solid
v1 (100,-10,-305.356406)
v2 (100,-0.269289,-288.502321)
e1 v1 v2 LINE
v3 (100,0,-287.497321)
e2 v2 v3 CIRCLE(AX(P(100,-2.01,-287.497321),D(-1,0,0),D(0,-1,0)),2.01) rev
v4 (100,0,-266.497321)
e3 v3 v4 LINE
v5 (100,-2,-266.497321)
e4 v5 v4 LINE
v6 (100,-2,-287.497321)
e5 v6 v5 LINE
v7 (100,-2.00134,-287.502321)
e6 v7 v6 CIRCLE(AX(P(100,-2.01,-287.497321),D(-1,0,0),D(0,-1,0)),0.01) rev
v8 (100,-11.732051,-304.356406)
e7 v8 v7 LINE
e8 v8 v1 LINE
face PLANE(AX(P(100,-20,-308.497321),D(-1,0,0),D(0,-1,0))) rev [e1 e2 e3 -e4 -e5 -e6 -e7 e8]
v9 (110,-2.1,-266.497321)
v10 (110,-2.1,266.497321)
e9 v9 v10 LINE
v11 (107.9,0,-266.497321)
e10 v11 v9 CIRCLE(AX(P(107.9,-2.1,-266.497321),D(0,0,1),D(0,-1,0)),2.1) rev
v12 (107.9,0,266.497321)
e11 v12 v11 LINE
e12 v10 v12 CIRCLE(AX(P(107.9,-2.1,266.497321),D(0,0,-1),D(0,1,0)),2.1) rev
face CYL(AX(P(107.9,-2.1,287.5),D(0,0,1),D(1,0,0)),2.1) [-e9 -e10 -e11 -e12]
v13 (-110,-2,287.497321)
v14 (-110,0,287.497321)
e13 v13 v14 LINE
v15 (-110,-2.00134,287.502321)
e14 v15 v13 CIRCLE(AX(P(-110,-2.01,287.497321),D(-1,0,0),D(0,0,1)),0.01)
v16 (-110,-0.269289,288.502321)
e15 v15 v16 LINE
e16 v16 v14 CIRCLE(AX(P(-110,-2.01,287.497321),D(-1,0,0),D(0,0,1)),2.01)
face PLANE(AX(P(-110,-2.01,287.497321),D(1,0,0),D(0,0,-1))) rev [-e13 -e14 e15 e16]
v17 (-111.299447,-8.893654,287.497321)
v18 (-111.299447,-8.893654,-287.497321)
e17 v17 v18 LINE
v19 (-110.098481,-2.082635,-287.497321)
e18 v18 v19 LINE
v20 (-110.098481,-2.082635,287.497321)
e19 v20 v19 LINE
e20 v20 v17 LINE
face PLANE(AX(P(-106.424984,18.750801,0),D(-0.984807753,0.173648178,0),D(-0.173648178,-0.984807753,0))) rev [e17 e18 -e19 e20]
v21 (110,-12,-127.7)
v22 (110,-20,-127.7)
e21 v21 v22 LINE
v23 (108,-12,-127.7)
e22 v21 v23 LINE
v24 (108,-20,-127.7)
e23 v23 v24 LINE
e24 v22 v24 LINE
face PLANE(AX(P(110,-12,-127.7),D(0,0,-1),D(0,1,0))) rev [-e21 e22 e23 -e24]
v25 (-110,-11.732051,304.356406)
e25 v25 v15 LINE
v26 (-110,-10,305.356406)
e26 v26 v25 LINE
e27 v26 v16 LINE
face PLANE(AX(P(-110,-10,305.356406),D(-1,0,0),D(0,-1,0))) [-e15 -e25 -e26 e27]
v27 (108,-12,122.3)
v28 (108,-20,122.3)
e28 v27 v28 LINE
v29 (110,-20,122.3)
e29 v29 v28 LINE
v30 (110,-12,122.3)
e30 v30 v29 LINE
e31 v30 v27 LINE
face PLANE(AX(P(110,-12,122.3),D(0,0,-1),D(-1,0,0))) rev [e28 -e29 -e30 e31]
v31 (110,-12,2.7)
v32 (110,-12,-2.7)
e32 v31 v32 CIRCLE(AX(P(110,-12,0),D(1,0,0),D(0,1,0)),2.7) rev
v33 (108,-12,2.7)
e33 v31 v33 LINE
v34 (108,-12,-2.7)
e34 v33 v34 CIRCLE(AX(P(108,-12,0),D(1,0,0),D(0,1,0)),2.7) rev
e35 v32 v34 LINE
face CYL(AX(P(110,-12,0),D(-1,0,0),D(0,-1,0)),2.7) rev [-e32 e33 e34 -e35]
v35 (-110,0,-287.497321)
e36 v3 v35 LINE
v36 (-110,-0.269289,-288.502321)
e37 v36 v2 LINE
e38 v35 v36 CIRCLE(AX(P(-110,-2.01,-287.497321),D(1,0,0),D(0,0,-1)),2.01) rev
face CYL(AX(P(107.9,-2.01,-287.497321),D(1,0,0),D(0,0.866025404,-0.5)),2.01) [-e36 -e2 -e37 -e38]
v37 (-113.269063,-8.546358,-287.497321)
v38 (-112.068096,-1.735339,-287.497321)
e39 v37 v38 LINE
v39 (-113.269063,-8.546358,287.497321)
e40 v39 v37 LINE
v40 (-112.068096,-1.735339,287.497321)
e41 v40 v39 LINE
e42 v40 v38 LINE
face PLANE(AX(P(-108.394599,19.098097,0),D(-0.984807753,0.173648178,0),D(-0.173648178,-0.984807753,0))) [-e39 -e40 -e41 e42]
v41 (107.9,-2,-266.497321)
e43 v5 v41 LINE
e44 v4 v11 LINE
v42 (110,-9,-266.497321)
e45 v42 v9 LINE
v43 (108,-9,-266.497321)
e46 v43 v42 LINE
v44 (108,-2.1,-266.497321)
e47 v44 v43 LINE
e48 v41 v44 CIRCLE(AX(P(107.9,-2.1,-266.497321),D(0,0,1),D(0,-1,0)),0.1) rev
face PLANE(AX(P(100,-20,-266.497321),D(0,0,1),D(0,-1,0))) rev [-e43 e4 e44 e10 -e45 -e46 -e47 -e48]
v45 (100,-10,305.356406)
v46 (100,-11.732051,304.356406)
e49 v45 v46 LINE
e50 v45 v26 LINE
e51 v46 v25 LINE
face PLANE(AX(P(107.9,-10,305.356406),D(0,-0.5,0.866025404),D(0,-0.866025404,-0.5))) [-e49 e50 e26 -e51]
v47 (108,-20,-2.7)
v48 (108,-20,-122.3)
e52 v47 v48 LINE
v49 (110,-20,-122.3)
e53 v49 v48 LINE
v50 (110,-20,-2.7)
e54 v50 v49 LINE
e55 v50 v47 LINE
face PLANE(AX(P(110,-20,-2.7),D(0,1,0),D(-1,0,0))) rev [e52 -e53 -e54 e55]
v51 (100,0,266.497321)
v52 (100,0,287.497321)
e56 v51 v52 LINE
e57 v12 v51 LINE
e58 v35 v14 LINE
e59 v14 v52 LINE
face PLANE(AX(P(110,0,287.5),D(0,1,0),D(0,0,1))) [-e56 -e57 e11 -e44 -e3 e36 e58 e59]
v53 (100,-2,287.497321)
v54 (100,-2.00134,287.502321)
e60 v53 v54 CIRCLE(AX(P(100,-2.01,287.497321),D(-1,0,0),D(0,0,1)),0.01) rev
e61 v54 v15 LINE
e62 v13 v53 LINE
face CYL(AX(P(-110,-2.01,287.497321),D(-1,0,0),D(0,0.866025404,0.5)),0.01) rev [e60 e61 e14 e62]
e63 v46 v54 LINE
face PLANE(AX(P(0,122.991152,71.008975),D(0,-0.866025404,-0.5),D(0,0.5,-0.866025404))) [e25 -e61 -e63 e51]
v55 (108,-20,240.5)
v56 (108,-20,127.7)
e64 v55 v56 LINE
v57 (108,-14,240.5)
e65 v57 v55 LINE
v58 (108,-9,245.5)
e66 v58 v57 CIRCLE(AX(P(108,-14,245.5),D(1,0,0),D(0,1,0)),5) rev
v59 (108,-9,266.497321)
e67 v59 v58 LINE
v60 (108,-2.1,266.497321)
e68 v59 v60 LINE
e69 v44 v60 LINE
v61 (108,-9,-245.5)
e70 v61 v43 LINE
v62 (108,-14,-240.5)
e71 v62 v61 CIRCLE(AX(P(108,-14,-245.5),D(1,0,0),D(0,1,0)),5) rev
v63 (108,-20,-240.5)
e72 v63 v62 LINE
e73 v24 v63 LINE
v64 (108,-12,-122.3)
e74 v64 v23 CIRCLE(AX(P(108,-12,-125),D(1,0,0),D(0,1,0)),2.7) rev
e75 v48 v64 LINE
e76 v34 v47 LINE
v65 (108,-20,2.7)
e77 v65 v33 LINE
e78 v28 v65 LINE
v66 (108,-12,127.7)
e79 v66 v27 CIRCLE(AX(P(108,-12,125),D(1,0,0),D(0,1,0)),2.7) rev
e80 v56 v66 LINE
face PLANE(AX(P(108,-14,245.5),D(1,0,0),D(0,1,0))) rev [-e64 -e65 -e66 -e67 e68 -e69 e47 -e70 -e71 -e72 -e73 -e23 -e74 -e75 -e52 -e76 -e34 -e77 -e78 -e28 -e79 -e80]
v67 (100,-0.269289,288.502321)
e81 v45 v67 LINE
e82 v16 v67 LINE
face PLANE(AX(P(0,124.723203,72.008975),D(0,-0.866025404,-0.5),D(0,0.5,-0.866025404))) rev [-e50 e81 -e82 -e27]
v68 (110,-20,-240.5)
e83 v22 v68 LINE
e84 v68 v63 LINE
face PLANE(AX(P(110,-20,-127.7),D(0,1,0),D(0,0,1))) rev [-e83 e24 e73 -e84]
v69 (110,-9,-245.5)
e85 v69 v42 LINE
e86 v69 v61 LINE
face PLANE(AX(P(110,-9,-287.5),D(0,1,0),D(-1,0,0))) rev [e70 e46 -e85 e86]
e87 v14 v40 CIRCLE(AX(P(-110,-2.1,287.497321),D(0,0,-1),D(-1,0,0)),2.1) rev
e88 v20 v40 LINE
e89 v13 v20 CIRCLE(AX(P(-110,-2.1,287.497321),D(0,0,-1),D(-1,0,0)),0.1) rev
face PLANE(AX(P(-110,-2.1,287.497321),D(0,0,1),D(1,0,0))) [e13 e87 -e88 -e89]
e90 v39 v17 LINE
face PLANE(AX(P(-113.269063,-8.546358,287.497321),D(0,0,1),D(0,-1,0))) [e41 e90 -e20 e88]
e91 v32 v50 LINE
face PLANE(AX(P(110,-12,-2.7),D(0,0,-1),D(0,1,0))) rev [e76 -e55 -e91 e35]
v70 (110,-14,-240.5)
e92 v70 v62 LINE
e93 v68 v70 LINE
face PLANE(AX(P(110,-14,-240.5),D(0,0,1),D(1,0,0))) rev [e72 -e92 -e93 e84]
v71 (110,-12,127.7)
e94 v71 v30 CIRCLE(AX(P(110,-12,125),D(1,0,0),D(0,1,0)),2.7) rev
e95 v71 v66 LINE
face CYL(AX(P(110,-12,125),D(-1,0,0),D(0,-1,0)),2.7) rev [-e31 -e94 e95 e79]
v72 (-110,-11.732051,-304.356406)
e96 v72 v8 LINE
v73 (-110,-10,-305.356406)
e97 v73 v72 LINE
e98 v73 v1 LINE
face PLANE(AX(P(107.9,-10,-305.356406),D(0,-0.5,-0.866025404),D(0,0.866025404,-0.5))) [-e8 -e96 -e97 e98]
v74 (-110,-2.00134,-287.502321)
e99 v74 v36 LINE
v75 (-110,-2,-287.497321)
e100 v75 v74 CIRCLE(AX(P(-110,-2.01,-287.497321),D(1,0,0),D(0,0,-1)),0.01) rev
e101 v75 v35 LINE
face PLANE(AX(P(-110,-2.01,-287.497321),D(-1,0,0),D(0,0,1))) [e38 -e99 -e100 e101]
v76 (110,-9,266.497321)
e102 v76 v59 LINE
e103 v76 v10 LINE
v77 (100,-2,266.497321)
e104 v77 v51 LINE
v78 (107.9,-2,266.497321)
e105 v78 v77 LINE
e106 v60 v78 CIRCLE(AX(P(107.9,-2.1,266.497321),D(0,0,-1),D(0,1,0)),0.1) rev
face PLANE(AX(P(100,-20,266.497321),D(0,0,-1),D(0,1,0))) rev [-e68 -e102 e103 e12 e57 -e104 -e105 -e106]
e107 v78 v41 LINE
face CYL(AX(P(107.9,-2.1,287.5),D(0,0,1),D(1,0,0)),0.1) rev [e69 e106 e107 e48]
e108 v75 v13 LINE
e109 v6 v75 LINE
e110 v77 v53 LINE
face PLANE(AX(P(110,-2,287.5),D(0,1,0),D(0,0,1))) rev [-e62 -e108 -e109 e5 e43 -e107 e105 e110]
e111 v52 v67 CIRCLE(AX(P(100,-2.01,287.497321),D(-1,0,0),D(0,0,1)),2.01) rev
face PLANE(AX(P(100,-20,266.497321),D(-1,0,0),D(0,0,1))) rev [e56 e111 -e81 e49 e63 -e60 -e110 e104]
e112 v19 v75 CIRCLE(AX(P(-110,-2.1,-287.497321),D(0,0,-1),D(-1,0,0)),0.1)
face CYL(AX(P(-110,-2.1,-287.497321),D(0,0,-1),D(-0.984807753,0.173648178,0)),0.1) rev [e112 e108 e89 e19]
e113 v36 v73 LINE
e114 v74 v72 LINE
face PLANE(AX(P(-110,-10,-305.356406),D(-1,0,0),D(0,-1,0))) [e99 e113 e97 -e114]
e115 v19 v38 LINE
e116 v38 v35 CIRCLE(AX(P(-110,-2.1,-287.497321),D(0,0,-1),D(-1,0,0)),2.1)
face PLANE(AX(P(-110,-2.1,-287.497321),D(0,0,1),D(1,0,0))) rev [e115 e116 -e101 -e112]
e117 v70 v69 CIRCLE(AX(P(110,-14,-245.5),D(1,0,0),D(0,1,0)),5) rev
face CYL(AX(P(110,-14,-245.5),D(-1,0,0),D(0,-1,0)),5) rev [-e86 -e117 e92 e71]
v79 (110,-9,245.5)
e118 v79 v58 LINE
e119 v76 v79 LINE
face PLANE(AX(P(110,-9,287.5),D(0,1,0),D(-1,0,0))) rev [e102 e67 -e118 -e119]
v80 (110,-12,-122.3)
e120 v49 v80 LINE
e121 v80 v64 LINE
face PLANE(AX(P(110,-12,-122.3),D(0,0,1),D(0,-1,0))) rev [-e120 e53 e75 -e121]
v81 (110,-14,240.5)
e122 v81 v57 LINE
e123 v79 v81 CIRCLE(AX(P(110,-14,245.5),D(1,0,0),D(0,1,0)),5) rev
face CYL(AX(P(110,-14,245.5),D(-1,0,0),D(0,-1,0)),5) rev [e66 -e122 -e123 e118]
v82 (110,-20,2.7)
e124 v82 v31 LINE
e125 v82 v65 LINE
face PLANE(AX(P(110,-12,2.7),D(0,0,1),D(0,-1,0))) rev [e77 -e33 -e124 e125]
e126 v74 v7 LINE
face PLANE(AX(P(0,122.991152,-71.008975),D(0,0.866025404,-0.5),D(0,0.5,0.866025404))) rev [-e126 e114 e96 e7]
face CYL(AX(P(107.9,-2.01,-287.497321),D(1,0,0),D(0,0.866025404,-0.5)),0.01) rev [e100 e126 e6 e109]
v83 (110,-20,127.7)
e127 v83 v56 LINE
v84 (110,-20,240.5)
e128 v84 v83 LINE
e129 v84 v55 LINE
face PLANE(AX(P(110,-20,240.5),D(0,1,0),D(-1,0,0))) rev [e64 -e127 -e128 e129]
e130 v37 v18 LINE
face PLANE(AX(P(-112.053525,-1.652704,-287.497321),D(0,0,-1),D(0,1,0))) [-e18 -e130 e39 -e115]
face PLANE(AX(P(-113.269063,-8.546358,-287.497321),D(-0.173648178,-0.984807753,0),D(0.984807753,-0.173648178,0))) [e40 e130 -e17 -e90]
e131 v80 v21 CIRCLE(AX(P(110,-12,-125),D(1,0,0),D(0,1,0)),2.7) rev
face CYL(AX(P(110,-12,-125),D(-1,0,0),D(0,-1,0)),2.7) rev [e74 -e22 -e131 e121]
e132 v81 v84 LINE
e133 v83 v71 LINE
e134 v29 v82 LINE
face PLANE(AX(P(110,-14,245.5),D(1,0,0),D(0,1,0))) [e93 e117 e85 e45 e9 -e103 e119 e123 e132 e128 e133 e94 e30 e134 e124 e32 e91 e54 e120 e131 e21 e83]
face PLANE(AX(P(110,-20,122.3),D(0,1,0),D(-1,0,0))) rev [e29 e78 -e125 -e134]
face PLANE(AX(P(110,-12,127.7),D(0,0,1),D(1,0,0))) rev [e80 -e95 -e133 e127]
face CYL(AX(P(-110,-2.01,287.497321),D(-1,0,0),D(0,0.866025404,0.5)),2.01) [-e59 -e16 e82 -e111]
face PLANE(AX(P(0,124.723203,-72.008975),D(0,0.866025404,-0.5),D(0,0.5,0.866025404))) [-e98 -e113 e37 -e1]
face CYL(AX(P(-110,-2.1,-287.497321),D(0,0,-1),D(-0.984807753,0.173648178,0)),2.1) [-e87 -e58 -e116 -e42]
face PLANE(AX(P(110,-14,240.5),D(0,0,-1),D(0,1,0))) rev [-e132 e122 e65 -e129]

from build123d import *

# Parameters (mm, degrees)
SKIZZE9_W                       = 220
SKIZZE9_H                       = 575
BASIS_BLECH2_DEPTH              = 2
KANTE_LASCHE3_STRIP_W           = 8.2
KANTE_LASCHE3_STRIP_H           = 2
KANTE_LASCHE3_STRIP_CUT_DEPTH   = 575
KANTE_LASCHE3_DEPTH             = 575
KANTE_LASCHE3_FLAT_DEPTH        = 2
KANTE_LASCHE4_STRIP_CUT_DEPTH   = 217.9
KANTE_LASCHE4_STRIP_CUT_2_DEPTH = 217.9
KANTE_LASCHE4_DEPTH             = 217.9
KANTE_LASCHE4_BEND_DEPTH        = 217.9
SKIZZE43_W                      = 10
SKIZZE43_H                      = 42
SCHNITT_LINEAR_AUSTRAGEN4_DEPTH = 326.18077275
KANTE_LASCHE5_DEPTH             = 574.994641016


# Sheet-metal steps are written as plain solids
with BuildPart() as part:
    # Skizze9 → Basis-Blech2 (new body)
    with BuildSketch(Plane(origin=(0, 0, 0), x_dir=(1, 0, 0), z_dir=(0, 1, 0))):
        Rectangle(SKIZZE9_W, SKIZZE9_H)
    extrude(amount=-BASIS_BLECH2_DEPTH)

    # Kante-Lasche3 strip (across the edge) → Kante-Lasche3 strip cut (cut)
    with BuildSketch(Plane(origin=(110, -2, -287.5), x_dir=(-1, 0, 0), z_dir=(0, 0, 1))):
        with Locations((-2, -1)):
            Rectangle(KANTE_LASCHE3_STRIP_W, KANTE_LASCHE3_STRIP_H)
    extrude(amount=KANTE_LASCHE3_STRIP_CUT_DEPTH, mode=Mode.SUBTRACT)

    # Kante-Lasche3 bend section (across the edge) → Kante-Lasche3 (add)
    with BuildSketch(Plane(origin=(110, -2, -287.5), x_dir=(-1, 0, 0), z_dir=(0, 0, 1))):
        with BuildLine():
            Line((0, 0.1), (2, 0.1))
            ThreePointArc((2, 0.1), (2.029289322, 0.029289322), (2.1, 0))
            Line((2.1, 0), (2.1, -2))
            ThreePointArc((2.1, -2), (0.61507576, -1.38492424), (0, 0.1))
        make_face()
    extrude(amount=KANTE_LASCHE3_DEPTH)

    # Kante-Lasche3 profile (on flange) → Kante-Lasche3 flat (add)
    with BuildSketch(Plane(origin=(110, -2, 0), x_dir=(0, 0, 1), z_dir=(1, 0, 0))):
        with BuildLine():
            Line((287.5, 0.1), (287.5, 7))
            Line((287.5, 7), (245.5, 7))
            ThreePointArc((245.5, 7), (241.964466094, 8.464466094), (240.5, 12))
            Line((240.5, 12), (240.5, 18))
            Line((240.5, 18), (127.7, 18))
            Line((127.7, 18), (127.7, 10))
            ThreePointArc((127.7, 10), (125, 7.3), (122.3, 10))
            Line((122.3, 10), (122.3, 18))
            Line((122.3, 18), (2.7, 18))
            Line((2.7, 18), (2.7, 10))
            ThreePointArc((2.7, 10), (0, 7.3), (-2.7, 10))
            Line((-2.7, 10), (-2.7, 18))
            Line((-2.7, 18), (-122.3, 18))
            Line((-122.3, 18), (-122.3, 10))
            ThreePointArc((-122.3, 10), (-125, 7.3), (-127.7, 10))
            Line((-127.7, 10), (-127.7, 18))
            Line((-127.7, 18), (-240.5, 18))
            Line((-240.5, 18), (-240.5, 12))
            ThreePointArc((-240.5, 12), (-241.964466094, 8.464466094), (-245.5, 7))
            Line((-245.5, 7), (-287.5, 7))
            Line((-287.5, 7), (-287.5, 0.1))
            Line((-287.5, 0.1), (287.5, 0.1))
        make_face()
    extrude(amount=-KANTE_LASCHE3_FLAT_DEPTH)

    # Kante-Lasche4 strip (across the edge) → Kante-Lasche4 strip cut (cut)
    with BuildSketch(Plane(origin=(-110, -2, -287.5), x_dir=(0, -0.8660254037844416, 0.49999999999999495), z_dir=(1, 0, 0))):
        Polygon((-5.740711062, 5.94320323), (-1.730711062, -1.002320508), (0.001339746, -0.002320508), (-4.008660254, 6.94320323), align=None)
    extrude(amount=KANTE_LASCHE4_STRIP_CUT_DEPTH, mode=Mode.SUBTRACT)

    # Kante-Lasche4 strip 2 (across the edge) → Kante-Lasche4 strip cut 2 (cut)
    with BuildSketch(Plane(origin=(107.9, -2, 287.5), x_dir=(0, -0.8660254037844416, -0.49999999999999495), z_dir=(-1, 0, 0))):
        Polygon((-5.740711062, 5.94320323), (-1.730711062, -1.002320508), (0.001339746, -0.002320508), (-4.008660254, 6.94320323), align=None)
    extrude(amount=KANTE_LASCHE4_STRIP_CUT_2_DEPTH, mode=Mode.SUBTRACT)

    # Kante-Lasche4 section (across the edge) → Kante-Lasche4 (add)
    with BuildSketch(Plane(origin=(-110, -2, -287.5), x_dir=(0, -0.8660254037844416, 0.49999999999999495), z_dir=(1, 0, 0))):
        with BuildLine():
            Line((-2, 0.002679492), (-2, 19.464101615))
            Line((-2, 19.464101615), (0, 19.464101615))
            Line((0, 19.464101615), (0, 0.002679492))
            ThreePointArc((0, 0.002679492), (0.000340742, 9.1301e-05), (0.001339746, -0.002320508))
            Line((0.001339746, -0.002320508), (-1.730711062, -1.002320508))
            ThreePointArc((-1.730711062, -1.002320508), (-1.931510911, -0.517546789), (-2, 0.002679492))
        make_face()
    extrude(amount=KANTE_LASCHE4_DEPTH)

    # Kante-Lasche4 section 2 (across the edge) → Kante-Lasche4 bend (add)
    with BuildSketch(Plane(origin=(107.9, -2, 287.5), x_dir=(0, -0.8660254037844416, -0.49999999999999495), z_dir=(-1, 0, 0))):
        with BuildLine():
            Line((-2, 0.002679492), (-2, 19.464101615))
            Line((-2, 19.464101615), (0, 19.464101615))
            Line((0, 19.464101615), (0, 0.002679492))
            ThreePointArc((0, 0.002679492), (0.000340742, 9.1301e-05), (0.001339746, -0.002320508))
            Line((0.001339746, -0.002320508), (-1.730711062, -1.002320508))
            ThreePointArc((-1.730711062, -1.002320508), (-1.931510911, -0.517546789), (-2, 0.002679492))
        make_face()
    extrude(amount=KANTE_LASCHE4_BEND_DEPTH)

    # Skizze43 → Schnitt-Linear austragen4 (cut, through all)
    with BuildSketch(Plane(origin=(0, 0, 0), x_dir=(1, 0, 0), z_dir=(0, 1, 0))):
        with Locations((105, 287.497320508)):
            Rectangle(SKIZZE43_W, SKIZZE43_H)
        with Locations((105, -287.497320508)):
            Rectangle(SKIZZE43_W, SKIZZE43_H)
    extrude(amount=-SCHNITT_LINEAR_AUSTRAGEN4_DEPTH, mode=Mode.SUBTRACT)

    # Kante-Lasche5 section (across the edge) → Kante-Lasche5 (add)
    with BuildSketch(Plane(origin=(-110.083909963, -2, 287.497320508), x_dir=(0.9848077530122075, -0.17364817766693427, 0), z_dir=(0, 0, -1))):
        with BuildLine():
            Line((-2, 0.083909963), (-2, 7))
            Line((-2, 7), (0, 7))
            Line((0, 7), (0, 0.083909963))
            ThreePointArc((0, 0.083909963), (0.023395556, 0.019631202), (0.082635182, -0.014570812))
            Line((0.082635182, -0.014570812), (-0.264661173, -1.984186318))
            ThreePointArc((-0.264661173, -1.984186318), (-1.508693331, -1.265944017), (-2, 0.083909963))
        make_face()
    extrude(amount=KANTE_LASCHE5_DEPTH)


solid = part.part
